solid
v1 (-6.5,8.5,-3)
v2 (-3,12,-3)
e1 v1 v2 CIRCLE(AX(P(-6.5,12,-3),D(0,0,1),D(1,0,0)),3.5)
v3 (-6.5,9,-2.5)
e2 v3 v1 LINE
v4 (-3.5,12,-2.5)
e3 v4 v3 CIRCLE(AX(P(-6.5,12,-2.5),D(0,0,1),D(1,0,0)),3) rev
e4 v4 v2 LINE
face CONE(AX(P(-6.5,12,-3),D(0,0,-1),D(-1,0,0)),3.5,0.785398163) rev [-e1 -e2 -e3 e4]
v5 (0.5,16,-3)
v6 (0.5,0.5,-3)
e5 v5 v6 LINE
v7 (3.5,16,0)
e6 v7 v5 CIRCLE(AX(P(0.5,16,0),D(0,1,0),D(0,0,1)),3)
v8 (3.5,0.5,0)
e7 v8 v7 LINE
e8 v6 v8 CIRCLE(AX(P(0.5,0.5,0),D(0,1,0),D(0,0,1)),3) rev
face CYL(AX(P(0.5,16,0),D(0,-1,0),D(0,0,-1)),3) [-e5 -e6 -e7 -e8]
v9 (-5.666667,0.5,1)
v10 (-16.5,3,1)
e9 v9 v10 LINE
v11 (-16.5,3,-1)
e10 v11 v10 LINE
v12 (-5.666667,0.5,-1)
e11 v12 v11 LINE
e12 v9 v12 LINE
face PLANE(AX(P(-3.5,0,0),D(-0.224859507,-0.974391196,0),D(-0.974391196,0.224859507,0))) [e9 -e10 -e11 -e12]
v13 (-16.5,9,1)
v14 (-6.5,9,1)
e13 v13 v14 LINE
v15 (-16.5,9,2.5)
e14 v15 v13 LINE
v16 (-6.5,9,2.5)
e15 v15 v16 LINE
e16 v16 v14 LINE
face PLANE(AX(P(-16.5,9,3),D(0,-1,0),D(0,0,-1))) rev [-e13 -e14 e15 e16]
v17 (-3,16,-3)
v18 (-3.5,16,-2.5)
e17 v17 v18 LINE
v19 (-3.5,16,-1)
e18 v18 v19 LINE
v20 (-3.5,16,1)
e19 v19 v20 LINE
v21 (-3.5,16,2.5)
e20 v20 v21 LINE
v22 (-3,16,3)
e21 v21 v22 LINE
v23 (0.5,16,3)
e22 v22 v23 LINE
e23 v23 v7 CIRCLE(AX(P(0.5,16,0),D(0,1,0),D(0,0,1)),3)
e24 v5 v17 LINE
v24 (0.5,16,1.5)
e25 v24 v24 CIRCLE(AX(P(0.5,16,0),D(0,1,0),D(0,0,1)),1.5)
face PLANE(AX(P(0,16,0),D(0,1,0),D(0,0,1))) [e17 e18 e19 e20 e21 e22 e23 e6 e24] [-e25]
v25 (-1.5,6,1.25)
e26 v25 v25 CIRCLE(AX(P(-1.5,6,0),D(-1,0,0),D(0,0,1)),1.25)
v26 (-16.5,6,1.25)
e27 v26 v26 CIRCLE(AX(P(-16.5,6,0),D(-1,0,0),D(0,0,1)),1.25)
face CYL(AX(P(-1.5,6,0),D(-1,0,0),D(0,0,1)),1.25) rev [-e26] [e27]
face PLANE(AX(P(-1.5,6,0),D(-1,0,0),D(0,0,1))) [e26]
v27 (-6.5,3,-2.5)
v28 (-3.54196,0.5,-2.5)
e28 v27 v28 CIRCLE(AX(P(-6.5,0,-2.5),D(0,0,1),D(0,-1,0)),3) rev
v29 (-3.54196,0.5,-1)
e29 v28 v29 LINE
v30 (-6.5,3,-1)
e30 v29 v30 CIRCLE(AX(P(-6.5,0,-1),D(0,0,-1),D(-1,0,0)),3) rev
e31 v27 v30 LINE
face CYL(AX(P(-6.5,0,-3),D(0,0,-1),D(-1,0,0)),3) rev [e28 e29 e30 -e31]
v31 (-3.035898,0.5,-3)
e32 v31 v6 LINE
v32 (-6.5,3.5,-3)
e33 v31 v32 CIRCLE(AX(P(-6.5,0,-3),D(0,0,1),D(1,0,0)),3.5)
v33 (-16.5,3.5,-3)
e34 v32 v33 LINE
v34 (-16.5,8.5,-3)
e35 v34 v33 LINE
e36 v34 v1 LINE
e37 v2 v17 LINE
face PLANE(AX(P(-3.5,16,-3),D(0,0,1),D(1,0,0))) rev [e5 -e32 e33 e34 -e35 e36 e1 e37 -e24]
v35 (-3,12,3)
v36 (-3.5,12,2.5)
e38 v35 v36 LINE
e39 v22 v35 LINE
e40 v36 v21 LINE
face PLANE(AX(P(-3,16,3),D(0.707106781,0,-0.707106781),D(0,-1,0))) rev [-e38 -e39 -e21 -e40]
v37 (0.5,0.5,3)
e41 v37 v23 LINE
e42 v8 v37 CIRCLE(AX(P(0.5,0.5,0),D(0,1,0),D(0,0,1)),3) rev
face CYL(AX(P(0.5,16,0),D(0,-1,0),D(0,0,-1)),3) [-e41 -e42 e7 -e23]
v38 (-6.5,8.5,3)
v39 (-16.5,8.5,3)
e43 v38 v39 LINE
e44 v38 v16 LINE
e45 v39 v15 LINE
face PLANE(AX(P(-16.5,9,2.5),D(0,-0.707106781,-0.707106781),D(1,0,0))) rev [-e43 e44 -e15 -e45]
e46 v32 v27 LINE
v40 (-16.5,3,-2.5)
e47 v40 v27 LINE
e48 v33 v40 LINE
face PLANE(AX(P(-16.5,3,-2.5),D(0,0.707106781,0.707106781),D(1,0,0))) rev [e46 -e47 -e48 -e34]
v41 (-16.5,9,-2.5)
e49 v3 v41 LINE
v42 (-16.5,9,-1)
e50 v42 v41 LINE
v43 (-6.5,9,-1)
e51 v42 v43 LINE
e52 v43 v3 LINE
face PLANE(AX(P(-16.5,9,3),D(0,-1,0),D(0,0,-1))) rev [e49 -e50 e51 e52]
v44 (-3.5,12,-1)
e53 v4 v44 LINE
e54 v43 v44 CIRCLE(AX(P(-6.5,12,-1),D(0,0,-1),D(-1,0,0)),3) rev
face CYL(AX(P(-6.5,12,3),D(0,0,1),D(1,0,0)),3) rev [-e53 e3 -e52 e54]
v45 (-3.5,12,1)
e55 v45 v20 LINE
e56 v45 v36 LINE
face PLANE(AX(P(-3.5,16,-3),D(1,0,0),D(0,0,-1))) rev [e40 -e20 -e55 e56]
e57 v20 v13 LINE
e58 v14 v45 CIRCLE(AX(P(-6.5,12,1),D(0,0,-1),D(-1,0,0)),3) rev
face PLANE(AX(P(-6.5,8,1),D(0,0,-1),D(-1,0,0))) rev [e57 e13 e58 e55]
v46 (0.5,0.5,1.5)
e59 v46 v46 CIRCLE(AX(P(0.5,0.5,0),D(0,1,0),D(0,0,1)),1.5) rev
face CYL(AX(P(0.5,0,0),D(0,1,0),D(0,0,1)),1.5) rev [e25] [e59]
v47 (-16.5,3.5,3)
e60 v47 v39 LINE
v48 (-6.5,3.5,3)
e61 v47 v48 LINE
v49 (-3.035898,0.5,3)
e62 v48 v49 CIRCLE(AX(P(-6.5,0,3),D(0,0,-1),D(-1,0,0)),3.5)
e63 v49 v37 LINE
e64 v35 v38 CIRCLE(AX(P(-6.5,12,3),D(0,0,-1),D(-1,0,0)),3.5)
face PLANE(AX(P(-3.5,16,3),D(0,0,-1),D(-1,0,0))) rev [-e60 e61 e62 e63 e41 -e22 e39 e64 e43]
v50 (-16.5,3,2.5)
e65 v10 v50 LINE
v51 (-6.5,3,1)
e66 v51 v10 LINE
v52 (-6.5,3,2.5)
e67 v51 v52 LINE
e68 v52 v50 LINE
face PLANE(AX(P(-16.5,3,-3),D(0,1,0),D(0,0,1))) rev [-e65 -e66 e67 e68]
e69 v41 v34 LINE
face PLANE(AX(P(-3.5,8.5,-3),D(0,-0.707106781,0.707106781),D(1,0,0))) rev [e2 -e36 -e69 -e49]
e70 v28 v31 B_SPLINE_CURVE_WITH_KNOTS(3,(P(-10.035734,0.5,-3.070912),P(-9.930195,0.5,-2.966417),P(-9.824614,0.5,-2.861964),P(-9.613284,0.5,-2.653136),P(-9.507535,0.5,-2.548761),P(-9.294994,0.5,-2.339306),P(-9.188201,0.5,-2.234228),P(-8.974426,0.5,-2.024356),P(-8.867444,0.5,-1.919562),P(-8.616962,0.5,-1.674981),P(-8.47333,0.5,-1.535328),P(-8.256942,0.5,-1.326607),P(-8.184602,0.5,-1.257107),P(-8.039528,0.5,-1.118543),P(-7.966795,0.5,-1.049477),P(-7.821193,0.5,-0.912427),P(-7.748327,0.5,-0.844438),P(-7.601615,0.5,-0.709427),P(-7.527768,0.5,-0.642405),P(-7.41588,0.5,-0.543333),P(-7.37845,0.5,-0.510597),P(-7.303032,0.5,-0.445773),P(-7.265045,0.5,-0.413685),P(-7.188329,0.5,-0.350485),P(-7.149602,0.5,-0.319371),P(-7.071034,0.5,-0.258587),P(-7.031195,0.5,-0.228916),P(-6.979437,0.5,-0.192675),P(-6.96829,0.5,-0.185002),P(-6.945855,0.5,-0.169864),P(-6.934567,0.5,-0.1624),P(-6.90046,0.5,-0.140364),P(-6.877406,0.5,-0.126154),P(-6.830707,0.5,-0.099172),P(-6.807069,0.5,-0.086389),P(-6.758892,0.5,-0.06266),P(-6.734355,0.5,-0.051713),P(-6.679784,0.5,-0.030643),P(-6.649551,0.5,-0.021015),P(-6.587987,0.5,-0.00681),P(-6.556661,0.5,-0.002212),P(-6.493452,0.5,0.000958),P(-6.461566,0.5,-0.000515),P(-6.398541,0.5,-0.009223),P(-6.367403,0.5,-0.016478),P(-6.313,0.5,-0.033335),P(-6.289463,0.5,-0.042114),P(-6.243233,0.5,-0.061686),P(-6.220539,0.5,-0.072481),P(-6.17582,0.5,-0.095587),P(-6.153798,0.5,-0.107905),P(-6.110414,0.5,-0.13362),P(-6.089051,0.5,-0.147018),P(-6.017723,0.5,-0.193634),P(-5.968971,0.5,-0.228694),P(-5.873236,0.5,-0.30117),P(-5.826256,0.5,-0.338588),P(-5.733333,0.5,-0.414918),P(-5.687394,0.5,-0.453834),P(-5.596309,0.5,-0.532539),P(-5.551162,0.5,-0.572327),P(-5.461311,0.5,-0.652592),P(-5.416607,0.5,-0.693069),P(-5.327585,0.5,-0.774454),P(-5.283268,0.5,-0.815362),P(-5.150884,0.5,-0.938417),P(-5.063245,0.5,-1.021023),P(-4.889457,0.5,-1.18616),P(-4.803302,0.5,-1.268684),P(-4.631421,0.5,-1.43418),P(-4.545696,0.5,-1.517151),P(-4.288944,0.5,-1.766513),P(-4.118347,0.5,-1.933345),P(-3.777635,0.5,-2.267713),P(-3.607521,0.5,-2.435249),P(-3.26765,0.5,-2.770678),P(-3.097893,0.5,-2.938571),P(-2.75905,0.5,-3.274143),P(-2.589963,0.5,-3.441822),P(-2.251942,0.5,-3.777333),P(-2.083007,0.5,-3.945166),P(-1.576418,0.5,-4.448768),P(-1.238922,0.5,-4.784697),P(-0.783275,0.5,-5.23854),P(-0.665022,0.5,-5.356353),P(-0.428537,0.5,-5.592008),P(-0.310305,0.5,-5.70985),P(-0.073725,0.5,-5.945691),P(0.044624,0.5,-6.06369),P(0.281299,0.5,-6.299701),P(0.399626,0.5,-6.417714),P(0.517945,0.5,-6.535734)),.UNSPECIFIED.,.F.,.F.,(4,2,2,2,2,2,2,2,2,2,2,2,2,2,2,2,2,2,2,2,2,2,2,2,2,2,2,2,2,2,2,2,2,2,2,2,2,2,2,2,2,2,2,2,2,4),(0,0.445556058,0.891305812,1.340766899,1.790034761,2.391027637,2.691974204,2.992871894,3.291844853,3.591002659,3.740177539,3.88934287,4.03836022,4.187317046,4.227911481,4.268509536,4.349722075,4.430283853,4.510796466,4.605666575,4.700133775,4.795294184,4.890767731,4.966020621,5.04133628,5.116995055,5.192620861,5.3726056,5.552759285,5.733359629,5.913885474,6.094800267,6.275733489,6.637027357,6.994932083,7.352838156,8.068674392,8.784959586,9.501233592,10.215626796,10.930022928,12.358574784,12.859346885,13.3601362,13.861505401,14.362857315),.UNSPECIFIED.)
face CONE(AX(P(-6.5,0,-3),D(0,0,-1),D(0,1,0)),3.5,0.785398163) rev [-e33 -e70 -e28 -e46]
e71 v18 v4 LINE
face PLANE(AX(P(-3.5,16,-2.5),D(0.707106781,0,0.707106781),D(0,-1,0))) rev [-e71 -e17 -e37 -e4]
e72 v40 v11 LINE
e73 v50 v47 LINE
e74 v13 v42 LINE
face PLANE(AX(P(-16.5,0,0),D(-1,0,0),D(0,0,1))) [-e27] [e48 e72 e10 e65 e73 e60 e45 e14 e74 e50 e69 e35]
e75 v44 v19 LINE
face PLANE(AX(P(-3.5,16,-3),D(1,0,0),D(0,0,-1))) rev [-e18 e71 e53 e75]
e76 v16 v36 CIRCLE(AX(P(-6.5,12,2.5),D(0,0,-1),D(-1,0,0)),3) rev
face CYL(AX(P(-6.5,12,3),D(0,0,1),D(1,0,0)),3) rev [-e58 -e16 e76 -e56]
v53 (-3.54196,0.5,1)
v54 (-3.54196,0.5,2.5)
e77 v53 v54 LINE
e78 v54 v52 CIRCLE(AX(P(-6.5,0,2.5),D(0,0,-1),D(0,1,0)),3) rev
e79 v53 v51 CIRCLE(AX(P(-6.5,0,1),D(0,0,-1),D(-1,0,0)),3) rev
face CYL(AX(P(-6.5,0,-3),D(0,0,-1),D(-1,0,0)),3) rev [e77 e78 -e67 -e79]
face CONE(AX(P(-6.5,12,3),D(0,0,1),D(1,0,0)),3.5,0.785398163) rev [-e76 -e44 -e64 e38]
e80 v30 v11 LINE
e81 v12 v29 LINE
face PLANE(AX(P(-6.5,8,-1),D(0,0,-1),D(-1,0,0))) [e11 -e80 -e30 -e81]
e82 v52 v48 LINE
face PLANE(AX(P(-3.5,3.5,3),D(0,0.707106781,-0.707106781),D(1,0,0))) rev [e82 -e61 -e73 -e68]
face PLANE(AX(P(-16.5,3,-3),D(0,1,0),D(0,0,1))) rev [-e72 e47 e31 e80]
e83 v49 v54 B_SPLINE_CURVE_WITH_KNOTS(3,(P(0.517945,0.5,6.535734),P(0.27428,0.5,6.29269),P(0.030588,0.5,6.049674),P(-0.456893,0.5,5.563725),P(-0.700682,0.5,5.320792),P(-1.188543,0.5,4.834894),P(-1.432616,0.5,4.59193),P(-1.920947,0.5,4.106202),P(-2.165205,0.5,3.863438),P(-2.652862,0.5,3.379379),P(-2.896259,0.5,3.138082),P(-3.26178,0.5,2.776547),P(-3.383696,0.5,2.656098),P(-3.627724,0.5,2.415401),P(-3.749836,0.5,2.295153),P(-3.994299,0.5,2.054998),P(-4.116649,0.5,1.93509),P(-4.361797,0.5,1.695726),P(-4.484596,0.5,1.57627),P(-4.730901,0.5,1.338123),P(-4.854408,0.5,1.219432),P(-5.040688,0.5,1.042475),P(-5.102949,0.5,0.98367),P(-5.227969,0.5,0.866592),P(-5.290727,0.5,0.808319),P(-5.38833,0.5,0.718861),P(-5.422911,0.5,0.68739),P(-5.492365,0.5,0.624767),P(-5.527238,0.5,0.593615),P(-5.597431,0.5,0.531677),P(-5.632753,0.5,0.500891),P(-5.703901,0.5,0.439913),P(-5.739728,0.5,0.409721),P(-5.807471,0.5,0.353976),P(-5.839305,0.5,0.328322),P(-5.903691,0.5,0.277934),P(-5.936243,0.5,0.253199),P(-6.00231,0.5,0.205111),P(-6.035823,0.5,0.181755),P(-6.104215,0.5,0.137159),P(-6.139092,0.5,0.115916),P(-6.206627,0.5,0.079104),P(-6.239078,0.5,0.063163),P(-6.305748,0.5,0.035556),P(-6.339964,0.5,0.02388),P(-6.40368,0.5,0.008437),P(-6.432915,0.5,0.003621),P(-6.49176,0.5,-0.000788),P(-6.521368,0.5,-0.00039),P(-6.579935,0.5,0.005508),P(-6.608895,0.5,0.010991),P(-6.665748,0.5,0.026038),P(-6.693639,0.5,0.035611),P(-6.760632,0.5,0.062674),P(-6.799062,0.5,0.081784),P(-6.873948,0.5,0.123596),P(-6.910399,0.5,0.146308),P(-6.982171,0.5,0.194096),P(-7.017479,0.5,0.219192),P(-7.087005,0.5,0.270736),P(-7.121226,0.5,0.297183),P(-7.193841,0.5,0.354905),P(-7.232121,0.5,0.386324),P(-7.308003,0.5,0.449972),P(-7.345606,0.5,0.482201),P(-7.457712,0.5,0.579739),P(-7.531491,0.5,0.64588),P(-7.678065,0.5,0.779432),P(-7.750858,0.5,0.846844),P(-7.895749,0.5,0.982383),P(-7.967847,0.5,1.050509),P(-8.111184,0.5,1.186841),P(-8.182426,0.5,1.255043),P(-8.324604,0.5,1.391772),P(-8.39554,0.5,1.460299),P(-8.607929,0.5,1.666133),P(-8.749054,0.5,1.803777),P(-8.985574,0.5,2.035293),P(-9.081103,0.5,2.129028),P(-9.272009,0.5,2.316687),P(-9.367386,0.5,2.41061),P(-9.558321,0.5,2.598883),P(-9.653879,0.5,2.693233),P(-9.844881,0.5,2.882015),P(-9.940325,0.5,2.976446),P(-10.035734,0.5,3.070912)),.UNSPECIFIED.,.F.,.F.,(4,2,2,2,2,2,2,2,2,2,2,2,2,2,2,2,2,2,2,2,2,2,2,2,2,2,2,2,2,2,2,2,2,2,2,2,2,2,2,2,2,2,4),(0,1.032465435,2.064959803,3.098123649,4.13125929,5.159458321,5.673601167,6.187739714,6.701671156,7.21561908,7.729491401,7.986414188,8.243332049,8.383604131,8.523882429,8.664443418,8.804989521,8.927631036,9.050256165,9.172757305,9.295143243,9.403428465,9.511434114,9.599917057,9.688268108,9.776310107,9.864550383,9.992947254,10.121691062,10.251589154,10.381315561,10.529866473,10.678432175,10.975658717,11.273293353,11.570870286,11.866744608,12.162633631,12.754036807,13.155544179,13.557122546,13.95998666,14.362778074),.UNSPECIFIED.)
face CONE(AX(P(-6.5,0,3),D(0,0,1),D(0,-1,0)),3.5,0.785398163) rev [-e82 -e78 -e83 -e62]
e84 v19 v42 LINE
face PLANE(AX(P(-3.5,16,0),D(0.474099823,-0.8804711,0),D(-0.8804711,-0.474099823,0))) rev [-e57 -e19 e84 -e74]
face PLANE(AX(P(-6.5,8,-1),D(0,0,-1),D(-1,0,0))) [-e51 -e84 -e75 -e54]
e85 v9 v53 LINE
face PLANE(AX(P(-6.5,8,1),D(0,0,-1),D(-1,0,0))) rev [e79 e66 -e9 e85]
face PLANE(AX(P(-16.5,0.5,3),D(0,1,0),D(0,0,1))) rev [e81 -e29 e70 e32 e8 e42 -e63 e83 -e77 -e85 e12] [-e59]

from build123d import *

# Parameters (mm, degrees)
SKETCH1_W               = 7
SKETCH1_H               = 6
BOSS_EXTRUDE1_DEPTH     = 16
FILLET1_R               = 3
SKETCH2_R               = 1.5
CUT_EXTRUDE1_DEPTH      = 16
SKETCH3_W               = 6
SKETCH3_H               = 6
BOSS_EXTRUDE2_DEPTH     = 13
FILLET2_R               = 3
CHAMFER1_SIZE           = 0.5
RIB1_REACH              = 25.179
SKETCH6_WALL_W          = 63.122131006
SKETCH6_WALL_H          = 2
RIB6_REACH              = 25.179
SKETCH7_WALL_W          = 61.69897201
SKETCH7_WALL_H          = 2
SKETCH8_R               = 1.25
CUT_EXTRUDE4_DEPTH      = 15
CUT_EXTRUDE6_DEPTH      = 24.178653973
CUT_EXTRUDE6_DEPTH_BACK = 24.178653973
SKETCH10_W              = 6
SKETCH10_H              = 0.5


with BuildPart() as part:
    # Sketch1 → Boss-Extrude1 (new body)
    with BuildSketch(Plane(origin=(0, 0, 0), x_dir=(1, 0, 0), z_dir=(0, 1, 0))):
        Rectangle(SKETCH1_W, SKETCH1_H)
    extrude(amount=BOSS_EXTRUDE1_DEPTH)

    # Fillet1
    fillet1_edges = [part.edges().sort_by_distance(p)[0] for p in [
        (3.5, 8, 3),
        (3.5, 8, -3),
    ]]
    fillet(fillet1_edges, radius=FILLET1_R - 0.0001)  # a hair under: the kernel refuses the full size

    # Sketch2 → Cut-Extrude1 (cut)
    with BuildSketch(Plane(origin=(0, 16, 0), x_dir=(1, 0, 0), z_dir=(0, 1, 0))):
        with Locations(Location((0.5, 0, 0), (0, 0, 270))):
            Circle(SKETCH2_R)
    extrude(amount=-CUT_EXTRUDE1_DEPTH, mode=Mode.SUBTRACT)

    # Sketch3 → Boss-Extrude2 (add)
    with BuildSketch(Plane.ZY.offset(3.5)):
        with Locations((0, 6)):
            Rectangle(SKETCH3_W, SKETCH3_H)
    extrude(amount=BOSS_EXTRUDE2_DEPTH)

    # Fillet2
    fillet2_edges = [part.edges().sort_by_distance(p)[0] for p in [
        (-3.5, 3, 0),
        (-3.5, 9, 0),
    ]]
    fillet(fillet2_edges, radius=FILLET2_R - 0.0001)  # a hair under: the kernel refuses the full size

    # Chamfer1
    chamfer1_edges = [part.edges().sort_by_distance(p)[0] for p in [
        (-11.49995, 9, -3),
        (-11.49995, 3, -3),
        (-11.49995, 3, 3),
        (-11.49995, 9, 3),
        (-4.378650367, 9.878650367, -3),
        (-4.378650367, 9.878650367, 3),
        (-4.378650367, 2.121349633, 3),
        (-4.378650367, 2.121349633, -3),
        (-3.5, 13.99995, 3),
        (-3.5, 13.99995, -3),
    ]]
    chamfer(chamfer1_edges, length=CHAMFER1_SIZE)

    # Sketch6 wall → Rib1 (add, up to next)
    with BuildSketch(Plane(origin=(-10, 12.5, 0), x_dir=(-0.880471099922, -0.474099823035, 0), z_dir=(-0.474099823035, 0.880471099922, 0)), mode=Mode.PRIVATE) as rib1_sk1:
        Rectangle(SKETCH6_WALL_W, SKETCH6_WALL_H)
    rib1_tool1 = extrude(rib1_sk1.sketch, amount=-RIB1_REACH, mode=Mode.PRIVATE) - part.part
    add(rib1_tool1.solids().sort_by_distance((-10, 12.5, 0))[0])

    # Sketch7 wall → Rib6 (add, up to next)
    with BuildSketch(Plane(origin=(-10, 1.5, 0), x_dir=(-0.974391195695, 0.224859506699, 0), z_dir=(0.224859506699, 0.974391195695, 0)), mode=Mode.PRIVATE) as rib6_sk1:
        Rectangle(SKETCH7_WALL_W, SKETCH7_WALL_H)
    rib6_tool1 = extrude(rib6_sk1.sketch, amount=RIB6_REACH, mode=Mode.PRIVATE) - part.part
    add(rib6_tool1.solids().sort_by_distance((-10, 1.5, 0))[0])

    # Sketch8 → Cut-Extrude4 (cut)
    with BuildSketch(Plane.ZY.offset(16.5)):
        with Locations((0, 6)):
            Circle(SKETCH8_R)
    extrude(amount=-CUT_EXTRUDE4_DEPTH, mode=Mode.SUBTRACT)

    # Sketch10 → Cut-Extrude6 (cut, two sides: drawn at the far end of the back side and taken through both)
    with BuildSketch(Plane(origin=(0, 0, 0), x_dir=(0, 0, -1), z_dir=(1, 0, 0)).offset(-CUT_EXTRUDE6_DEPTH_BACK)):
        with Locations((0, 0.25)):
            Rectangle(SKETCH10_W, SKETCH10_H)
    extrude(amount=CUT_EXTRUDE6_DEPTH + CUT_EXTRUDE6_DEPTH_BACK, mode=Mode.SUBTRACT)


solid = part.part
